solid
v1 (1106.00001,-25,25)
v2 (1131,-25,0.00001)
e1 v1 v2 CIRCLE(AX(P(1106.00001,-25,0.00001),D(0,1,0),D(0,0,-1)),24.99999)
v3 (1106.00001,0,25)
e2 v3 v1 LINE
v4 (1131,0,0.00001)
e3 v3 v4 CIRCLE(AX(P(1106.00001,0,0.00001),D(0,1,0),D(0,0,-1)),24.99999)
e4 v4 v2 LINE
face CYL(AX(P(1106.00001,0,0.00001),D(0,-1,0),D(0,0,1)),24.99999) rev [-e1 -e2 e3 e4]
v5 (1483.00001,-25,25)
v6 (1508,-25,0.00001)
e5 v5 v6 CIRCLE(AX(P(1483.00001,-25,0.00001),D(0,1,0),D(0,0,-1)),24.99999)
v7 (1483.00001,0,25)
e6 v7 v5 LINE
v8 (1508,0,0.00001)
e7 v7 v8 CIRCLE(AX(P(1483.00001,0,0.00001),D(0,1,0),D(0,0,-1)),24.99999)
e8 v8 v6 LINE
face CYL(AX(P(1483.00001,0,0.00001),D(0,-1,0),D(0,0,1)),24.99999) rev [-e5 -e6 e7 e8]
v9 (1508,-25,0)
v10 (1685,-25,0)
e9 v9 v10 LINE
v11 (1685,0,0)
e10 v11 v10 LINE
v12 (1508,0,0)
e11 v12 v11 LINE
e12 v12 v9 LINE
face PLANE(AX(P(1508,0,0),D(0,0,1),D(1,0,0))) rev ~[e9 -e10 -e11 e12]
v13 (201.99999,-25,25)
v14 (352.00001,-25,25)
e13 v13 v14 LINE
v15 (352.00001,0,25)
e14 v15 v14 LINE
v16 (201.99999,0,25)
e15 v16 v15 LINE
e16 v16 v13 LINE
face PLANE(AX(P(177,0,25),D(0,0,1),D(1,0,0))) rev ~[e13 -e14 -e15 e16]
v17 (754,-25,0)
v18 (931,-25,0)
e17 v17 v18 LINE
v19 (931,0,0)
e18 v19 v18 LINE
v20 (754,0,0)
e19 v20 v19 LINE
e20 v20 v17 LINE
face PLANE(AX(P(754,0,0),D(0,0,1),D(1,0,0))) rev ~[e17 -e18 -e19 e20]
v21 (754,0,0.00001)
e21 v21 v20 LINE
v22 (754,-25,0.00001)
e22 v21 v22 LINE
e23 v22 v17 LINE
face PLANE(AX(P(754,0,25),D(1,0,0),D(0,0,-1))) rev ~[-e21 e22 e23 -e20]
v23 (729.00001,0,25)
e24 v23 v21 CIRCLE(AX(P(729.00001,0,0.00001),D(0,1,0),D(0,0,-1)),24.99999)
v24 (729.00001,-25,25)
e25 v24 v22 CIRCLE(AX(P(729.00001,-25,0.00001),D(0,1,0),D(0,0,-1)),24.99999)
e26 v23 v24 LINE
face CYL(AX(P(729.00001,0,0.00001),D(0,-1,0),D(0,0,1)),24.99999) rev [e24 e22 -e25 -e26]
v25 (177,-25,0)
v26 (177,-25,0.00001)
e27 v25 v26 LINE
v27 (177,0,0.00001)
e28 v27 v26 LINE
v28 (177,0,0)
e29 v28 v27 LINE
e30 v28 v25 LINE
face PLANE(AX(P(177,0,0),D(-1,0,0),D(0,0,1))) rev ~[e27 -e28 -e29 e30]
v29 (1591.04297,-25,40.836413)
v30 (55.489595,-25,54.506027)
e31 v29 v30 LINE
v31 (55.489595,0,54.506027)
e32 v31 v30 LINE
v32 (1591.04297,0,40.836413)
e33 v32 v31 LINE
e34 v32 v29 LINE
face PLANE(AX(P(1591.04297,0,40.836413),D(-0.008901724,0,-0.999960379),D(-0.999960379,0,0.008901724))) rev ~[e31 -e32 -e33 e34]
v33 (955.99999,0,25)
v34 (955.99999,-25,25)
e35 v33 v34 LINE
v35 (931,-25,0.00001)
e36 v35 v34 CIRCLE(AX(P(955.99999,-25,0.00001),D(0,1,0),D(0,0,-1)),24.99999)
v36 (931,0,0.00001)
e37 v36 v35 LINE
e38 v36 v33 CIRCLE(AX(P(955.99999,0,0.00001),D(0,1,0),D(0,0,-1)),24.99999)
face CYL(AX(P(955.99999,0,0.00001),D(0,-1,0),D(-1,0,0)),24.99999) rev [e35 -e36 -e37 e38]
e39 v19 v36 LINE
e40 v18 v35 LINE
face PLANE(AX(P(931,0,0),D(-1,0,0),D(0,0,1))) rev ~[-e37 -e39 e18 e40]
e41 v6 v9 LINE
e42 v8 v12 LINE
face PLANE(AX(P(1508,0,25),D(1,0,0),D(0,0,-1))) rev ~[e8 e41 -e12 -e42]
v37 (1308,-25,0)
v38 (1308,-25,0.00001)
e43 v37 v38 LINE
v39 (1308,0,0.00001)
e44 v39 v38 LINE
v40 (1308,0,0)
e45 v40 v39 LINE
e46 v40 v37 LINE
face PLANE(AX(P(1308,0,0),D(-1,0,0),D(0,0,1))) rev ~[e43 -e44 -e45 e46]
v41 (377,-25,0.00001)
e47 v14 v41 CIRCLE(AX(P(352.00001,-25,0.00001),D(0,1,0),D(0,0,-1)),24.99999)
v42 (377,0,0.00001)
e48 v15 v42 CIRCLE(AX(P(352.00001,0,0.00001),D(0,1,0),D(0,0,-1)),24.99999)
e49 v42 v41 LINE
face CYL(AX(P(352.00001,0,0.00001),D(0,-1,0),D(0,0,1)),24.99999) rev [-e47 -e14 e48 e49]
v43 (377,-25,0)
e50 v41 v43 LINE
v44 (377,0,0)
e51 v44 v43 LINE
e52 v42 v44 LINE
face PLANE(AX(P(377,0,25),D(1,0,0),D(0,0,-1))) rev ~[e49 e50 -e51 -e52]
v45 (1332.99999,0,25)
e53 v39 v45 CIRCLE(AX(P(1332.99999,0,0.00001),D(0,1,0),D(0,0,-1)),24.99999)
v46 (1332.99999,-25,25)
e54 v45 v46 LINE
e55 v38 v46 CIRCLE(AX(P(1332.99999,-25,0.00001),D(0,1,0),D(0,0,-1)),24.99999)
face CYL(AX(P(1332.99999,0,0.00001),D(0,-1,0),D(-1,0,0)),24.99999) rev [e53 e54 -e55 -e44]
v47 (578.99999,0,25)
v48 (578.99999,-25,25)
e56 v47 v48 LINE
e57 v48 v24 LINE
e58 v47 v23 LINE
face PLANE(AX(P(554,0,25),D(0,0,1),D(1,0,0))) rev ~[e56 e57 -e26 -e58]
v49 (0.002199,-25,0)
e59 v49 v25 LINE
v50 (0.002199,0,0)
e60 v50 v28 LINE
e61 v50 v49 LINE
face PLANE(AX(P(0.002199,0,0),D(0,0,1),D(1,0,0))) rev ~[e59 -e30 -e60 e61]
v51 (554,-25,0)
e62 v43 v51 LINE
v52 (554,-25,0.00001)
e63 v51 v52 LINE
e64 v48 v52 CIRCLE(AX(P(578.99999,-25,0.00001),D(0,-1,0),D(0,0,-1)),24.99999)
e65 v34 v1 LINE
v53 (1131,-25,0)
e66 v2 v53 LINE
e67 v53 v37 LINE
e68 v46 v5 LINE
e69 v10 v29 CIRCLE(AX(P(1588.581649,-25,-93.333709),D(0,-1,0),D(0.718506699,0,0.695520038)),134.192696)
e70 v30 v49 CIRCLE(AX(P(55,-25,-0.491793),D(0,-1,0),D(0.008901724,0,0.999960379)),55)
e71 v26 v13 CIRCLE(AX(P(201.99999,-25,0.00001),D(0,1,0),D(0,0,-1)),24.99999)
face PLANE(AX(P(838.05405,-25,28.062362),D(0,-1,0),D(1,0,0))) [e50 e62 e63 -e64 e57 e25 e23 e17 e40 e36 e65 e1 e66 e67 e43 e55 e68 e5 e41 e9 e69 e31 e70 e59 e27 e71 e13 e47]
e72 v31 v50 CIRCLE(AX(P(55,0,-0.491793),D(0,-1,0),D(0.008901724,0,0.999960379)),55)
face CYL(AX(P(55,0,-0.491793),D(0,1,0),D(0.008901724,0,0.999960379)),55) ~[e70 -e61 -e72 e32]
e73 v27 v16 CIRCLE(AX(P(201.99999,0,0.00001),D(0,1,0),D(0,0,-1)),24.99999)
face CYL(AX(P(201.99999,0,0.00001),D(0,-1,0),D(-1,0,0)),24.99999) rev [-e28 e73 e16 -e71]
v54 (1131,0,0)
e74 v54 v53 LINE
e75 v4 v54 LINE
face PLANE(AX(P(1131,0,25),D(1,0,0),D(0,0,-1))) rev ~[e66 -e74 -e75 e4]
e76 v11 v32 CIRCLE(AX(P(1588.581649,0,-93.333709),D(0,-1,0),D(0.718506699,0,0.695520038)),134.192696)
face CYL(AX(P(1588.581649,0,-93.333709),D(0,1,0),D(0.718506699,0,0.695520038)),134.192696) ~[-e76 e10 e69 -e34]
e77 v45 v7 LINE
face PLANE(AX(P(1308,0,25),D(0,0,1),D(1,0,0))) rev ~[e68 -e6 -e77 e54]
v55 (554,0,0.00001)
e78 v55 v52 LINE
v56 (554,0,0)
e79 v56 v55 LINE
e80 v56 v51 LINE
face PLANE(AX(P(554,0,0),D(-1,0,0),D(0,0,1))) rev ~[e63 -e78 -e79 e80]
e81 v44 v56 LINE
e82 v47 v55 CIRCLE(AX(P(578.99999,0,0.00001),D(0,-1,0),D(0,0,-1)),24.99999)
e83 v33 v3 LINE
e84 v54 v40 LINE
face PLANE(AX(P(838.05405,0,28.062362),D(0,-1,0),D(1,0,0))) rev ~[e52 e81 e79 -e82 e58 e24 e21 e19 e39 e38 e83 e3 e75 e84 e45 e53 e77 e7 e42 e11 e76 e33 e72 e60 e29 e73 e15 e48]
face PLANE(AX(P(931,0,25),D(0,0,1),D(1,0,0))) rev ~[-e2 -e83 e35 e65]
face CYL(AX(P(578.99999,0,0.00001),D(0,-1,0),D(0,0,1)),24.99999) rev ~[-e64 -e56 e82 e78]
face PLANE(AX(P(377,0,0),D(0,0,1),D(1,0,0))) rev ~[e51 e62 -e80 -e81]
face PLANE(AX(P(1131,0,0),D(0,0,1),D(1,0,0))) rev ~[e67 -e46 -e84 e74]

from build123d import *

# Parameters (mm, degrees)
F1_DEPTH = 25
F2_R     = 24.99999
F3_R     = 24.99999
F4_R     = 24.99999
F5_R     = 24.99999


# Not quite as in the source:
# - a fillet or chamfer is up to 0.001 mm smaller than in the source, because OpenCascade refuses the exact size


with BuildPart() as f1:
    # F0 (on Front) → F1 (new body)
    with BuildSketch(Plane.XZ):
        with BuildLine():
            ThreePointArc((55.4895948443, 54.5060273456), (16.4576480368, 38.7445048189), (0.0021987788, 0))
            Line((0.0021987788, 0), (177, 0))
            Line((177, 0), (177, 25))
            Line((177, 25), (377, 25))
            Line((377, 25), (377, 0))
            Line((377, 0), (554, 0))
            Line((554, 0), (554, 25))
            Line((554, 25), (754, 25))
            Line((754, 25), (754, 0))
            Line((754, 0), (931, 0))
            Line((931, 0), (931, 25))
            Line((931, 25), (1131, 25))
            Line((1131, 25), (1131, 0))
            Line((1131, 0), (1308, 0))
            Line((1308, 0), (1308, 25))
            Line((1308, 25), (1508, 25))
            Line((1508, 25), (1508, 0))
            Line((1508, 0), (1685, 0))
            ThreePointArc((1685, 0), (1642.0718401331, 29.7373237733), (1591.0429702736, 40.8364127275))
            Line((1591.0429702736, 40.8364127275), (55.4895948443, 54.5060273456))
        make_face()
    extrude(amount=F1_DEPTH)

    # F2 (radius 25 in the source; OpenCascade refuses exactly that, so slightly less here)
    f2_edges = [f1.edges().sort_by_distance(p)[0] for p in [
        (177, -12.5, 25),
    ]]
    fillet(f2_edges, radius=F2_R)

    # F3 (radius 25 in the source; OpenCascade refuses exactly that, so slightly less here)
    f3_edges = [f1.edges().sort_by_distance(p)[0] for p in [
        (377, -12.5, 25),
    ]]
    fillet(f3_edges, radius=F3_R)

    # F4 (radius 25 in the source; OpenCascade refuses exactly that, so slightly less here)
    f4_edges = [f1.edges().sort_by_distance(p)[0] for p in [
        (754, -12.5, 25),
        (1131, -12.5, 25),
    ]]
    fillet(f4_edges, radius=F4_R)

    # F5 (radius 25 in the source; OpenCascade refuses exactly that, so slightly less here)
    f5_edges = [f1.edges().sort_by_distance(p)[0] for p in [
        (1508, -12.5, 25),
        (554, -12.5, 25),
        (931, -12.5, 25),
        (1308, -12.5, 25),
    ]]
    fillet(f5_edges, radius=F5_R)


solid = f1.part
